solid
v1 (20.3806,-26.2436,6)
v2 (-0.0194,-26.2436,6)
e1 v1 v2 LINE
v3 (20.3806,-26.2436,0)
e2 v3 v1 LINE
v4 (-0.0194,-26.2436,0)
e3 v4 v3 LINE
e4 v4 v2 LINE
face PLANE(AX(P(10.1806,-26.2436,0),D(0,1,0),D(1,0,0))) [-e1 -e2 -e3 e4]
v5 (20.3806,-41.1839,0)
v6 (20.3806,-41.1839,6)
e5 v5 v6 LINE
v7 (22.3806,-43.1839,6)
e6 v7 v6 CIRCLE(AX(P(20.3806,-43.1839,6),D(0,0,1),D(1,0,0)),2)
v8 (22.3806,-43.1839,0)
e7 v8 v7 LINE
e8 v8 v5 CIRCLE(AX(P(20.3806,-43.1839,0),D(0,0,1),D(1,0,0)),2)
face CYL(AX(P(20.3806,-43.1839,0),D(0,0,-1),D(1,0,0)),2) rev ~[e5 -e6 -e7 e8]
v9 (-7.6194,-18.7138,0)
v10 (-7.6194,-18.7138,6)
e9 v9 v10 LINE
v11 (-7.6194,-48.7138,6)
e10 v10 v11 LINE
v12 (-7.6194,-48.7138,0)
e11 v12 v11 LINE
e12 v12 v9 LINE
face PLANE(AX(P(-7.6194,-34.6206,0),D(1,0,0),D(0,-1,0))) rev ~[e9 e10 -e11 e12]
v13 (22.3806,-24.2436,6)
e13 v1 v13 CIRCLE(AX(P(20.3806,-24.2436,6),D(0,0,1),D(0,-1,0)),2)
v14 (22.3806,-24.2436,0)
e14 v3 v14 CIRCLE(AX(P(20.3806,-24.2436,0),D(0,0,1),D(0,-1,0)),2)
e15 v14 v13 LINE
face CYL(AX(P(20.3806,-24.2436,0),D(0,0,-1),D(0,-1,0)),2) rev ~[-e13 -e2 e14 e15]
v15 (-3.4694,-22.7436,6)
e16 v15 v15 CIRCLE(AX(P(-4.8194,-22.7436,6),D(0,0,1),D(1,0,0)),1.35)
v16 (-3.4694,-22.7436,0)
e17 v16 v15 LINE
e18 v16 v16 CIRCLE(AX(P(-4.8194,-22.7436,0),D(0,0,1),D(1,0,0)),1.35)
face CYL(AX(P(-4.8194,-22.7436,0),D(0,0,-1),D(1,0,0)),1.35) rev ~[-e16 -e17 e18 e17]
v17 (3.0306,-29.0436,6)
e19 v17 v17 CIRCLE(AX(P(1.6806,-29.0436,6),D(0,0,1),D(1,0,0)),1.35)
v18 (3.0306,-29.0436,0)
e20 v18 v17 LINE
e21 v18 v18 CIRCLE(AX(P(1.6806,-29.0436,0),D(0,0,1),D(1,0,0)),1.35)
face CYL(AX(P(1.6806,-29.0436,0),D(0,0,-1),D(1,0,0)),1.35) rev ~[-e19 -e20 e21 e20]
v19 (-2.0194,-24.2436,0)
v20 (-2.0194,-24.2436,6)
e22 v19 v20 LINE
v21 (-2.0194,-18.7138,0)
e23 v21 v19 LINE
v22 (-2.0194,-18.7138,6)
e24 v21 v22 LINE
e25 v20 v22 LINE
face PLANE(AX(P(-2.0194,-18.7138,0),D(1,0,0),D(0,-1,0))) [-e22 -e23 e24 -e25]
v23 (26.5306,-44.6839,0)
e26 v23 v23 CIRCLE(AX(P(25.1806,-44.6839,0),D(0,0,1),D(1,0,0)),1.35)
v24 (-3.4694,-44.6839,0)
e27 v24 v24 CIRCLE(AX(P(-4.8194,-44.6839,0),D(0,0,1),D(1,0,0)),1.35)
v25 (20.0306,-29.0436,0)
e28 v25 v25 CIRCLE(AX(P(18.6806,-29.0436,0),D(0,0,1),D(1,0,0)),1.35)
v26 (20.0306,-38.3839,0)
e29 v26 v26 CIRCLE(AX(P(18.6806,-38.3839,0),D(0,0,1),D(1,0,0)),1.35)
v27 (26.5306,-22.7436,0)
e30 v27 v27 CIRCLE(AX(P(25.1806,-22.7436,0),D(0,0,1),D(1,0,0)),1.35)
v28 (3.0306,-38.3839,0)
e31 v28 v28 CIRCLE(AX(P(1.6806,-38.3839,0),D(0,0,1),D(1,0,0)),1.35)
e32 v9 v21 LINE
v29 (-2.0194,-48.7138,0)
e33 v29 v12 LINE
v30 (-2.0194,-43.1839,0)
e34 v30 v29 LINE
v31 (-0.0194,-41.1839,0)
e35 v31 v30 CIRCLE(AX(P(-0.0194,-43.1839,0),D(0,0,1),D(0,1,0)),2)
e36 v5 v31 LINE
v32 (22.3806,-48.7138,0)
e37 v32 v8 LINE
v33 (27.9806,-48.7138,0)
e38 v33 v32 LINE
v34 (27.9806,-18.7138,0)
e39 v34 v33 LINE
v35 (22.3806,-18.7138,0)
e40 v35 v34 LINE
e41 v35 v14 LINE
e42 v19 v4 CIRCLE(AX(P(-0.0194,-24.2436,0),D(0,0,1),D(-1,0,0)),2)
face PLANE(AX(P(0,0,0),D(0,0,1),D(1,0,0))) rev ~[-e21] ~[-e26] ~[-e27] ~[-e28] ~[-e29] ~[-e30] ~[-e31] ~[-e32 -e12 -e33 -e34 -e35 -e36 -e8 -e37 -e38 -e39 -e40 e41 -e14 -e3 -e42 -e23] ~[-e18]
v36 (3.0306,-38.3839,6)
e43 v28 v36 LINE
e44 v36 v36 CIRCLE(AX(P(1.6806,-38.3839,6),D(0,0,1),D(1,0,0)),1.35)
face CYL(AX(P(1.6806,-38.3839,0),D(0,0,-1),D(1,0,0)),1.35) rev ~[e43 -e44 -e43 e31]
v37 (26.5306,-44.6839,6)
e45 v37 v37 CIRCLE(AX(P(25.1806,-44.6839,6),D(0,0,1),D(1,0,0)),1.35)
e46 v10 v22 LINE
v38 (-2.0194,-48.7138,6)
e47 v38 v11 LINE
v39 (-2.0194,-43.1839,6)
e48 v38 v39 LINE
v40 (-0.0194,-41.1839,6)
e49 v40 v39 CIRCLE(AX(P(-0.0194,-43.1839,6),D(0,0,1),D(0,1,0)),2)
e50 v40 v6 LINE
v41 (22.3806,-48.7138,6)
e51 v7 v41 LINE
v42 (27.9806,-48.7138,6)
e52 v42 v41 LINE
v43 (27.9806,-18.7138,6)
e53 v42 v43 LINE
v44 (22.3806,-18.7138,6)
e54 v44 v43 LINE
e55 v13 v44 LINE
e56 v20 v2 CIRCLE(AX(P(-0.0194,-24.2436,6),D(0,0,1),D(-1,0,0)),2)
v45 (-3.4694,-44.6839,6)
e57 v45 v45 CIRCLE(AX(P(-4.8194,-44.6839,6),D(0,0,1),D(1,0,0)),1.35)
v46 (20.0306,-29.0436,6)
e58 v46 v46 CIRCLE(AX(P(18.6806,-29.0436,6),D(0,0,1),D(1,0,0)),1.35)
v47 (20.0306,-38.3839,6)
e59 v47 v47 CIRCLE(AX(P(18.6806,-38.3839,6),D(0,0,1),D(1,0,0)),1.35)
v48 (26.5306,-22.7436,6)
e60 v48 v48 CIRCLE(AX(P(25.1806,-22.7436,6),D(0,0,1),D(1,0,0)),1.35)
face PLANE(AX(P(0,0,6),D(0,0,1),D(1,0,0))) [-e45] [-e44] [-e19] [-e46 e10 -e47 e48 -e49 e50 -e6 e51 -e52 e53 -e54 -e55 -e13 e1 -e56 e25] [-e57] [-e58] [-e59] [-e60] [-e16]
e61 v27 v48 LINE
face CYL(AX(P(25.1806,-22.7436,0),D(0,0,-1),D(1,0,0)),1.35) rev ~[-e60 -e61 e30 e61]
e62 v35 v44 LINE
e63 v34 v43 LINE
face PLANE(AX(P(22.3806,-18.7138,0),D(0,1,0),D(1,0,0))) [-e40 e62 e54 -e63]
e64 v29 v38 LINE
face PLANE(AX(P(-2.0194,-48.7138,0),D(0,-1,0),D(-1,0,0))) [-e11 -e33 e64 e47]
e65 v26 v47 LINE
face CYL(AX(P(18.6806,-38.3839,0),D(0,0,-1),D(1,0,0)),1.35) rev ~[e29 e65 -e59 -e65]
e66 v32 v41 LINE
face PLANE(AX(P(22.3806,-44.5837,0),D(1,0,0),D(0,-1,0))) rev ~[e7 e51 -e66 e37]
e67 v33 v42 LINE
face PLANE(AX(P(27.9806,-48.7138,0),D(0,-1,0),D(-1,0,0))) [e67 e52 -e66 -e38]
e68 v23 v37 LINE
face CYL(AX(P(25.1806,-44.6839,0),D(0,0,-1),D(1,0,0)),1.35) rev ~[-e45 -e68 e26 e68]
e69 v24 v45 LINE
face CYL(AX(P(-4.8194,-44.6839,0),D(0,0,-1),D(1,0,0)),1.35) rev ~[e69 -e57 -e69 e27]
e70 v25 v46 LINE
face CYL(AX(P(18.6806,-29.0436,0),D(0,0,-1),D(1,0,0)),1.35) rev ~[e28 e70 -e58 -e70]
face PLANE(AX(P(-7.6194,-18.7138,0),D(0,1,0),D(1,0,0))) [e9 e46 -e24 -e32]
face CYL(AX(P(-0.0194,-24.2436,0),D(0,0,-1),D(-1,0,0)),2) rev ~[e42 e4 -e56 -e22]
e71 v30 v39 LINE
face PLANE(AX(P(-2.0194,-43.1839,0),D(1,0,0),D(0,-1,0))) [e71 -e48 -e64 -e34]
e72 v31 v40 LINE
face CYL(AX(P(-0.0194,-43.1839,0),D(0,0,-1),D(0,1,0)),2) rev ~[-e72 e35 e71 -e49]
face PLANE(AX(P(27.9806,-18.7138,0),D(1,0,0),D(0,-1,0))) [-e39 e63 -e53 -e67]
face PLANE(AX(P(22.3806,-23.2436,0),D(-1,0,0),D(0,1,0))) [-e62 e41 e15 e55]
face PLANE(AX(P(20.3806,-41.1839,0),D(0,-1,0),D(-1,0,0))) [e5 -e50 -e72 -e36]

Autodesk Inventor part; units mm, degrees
ref_plane "YZ Plane" through (0, 0, 0) normal (1, 0, 0) x (0, 1, 0)
ref_plane "XZ Plane" through (0, 0, 0) normal (0, 1, 0) x (-1, 0, 0)
ref_plane "XY Plane" through (0, 0, 0) normal (0, 0, 1) x (1, 0, 0)
sketch "스케치1" plane through (0, 0, 0) normal (0, 0, 1) x (1, 0, 0)
  line L0 (22.3806, -23.2436) -> (22.3806, 15.7564)
  arc A0 (20.3806, -26.2436) -> (22.3806, -24.2436) centre (20.3806, -24.2436) ccw
  line L1 (22.3806, -24.2436) -> (22.3806, -22.8439)
  line L2 (18.7808, -26.2436) -> (20.3806, -26.2436)
  line L3 (0.9806, -26.2436) -> (19.3806, -26.2436)
  arc A1 (-2.0194, -24.2436) -> (-0.0194, -26.2436) centre (-0.0194, -24.2436) ccw
  line L4 (-0.0194, -26.2436) -> (1.5803, -26.2436)
  line L5 (-2.0194, -24.2436) -> (-2.0194, -22.8439)
  line L6 (-2.0194, 15.7564) -> (-2.0194, -23.2436)
  circle A2 centre (25.1806, -22.7436) radius 1.45
  circle A3 centre (18.6806, -29.0436) radius 1.45
  circle A4 centre (1.6806, -29.0436) radius 1.45
  circle A5 centre (-4.8194, -22.7436) radius 1.45
  line L7 (-7.6194, -18.7138) -> (27.9806, -18.7138)
  line L8 (-7.6194, -18.7138) -> (27.9806, -18.7138)
  arc A6 (-0.0194, -41.1839) -> (-2.0194, -43.1839) centre (-0.0194, -43.1839) ccw
  line L9 (-2.0194, -43.1839) -> (-2.0194, -44.5837)
  line L10 (1.5803, -41.1839) -> (-0.0194, -41.1839)
  line L11 (19.3806, -41.1839) -> (0.9806, -41.1839)
  arc A7 (22.3806, -43.1839) -> (20.3806, -41.1839) centre (20.3806, -43.1839) ccw
  line L12 (20.3806, -41.1839) -> (18.7808, -41.1839)
  line L13 (22.3806, -43.1839) -> (22.3806, -44.5837)
  circle A8 centre (-4.8194, -44.6839) radius 1.45
  circle A9 centre (1.6806, -38.3839) radius 1.45
  circle A10 centre (18.6806, -38.3839) radius 1.45
  circle A11 centre (25.1806, -44.6839) radius 1.45
  line L14 (27.9806, -48.7138) -> (-7.6194, -48.7138)
  line L15 (27.9806, -48.7138) -> (-7.6194, -48.7138)
  line L16 (-2.0194, -44.5837) -> (-2.0194, -48.7138)
  line L17 (22.3806, -44.5837) -> (22.3806, -48.7138)
  line L18 (10.1806, -18.7138) -> (10.1806, -33.7138)
  line L19 (-7.6194, -48.7138) -> (27.9806, -48.7138)
  line L20 (27.9806, -48.7138) -> (27.9806, -33.7138)
  line L21 (27.9806, -33.7138) -> (-7.6194, -33.7138)
  line L22 (-7.6194, -33.7138) -> (-7.6194, -48.7138)
  circle A12 centre (10.1806, -33.7138) radius 2.4281
  line L23 (-7.6194, -18.7138) -> (-7.6194, -34.6206)
  line L24 (27.9806, -18.7138) -> (27.9806, -33.7138)
  circle A13 centre (-4.8194, -22.7436) radius 1.35
  circle A14 centre (1.6806, -29.0436) radius 1.35
  circle A15 centre (18.6806, -29.0436) radius 1.35
  circle A16 centre (25.1806, -22.7436) radius 1.35
  circle A17 centre (18.6806, -38.3839) radius 1.35
  circle A18 centre (25.1806, -44.6839) radius 1.35
  circle A19 centre (1.6806, -38.3839) radius 1.35
  circle A20 centre (-4.8194, -44.6839) radius 1.35
  point P0 (0, 0)
  point P1 (-7.1939, 58.7329)
  point P2 (22.3806, -18.7138)
  point P3 (-2.0194, -18.7138)
  point P4 (27.9806, -25.8436)
  point P5 (-7.6194, -25.8436)
  point P6 (-2.0194, -44.1839)
  point P7 (-7.6194, -41.5839)
  point P8 (22.3806, -44.1839)
  point P9 (27.9806, -41.5839)
  point P10 (-2.0194, -18.7138)
  point P11 (22.3806, -18.7138)
  point P12 (10.1806, -48.7138)
  dimension "d11" = 30
  dimension "d12" = 15
  dimension "d13" = 15
  dimension "d14" = 2.7
  dimension "d15" = 2.7
  dimension "d16" = 2.7
  dimension "d17" = 2.7
  dimension "d18" = 2.7
  dimension "d19" = 2.7
  dimension "d20" = 2.7
  dimension "d21" = 2.7
extrude "돌출1" add sketch "스케치1" along normal blind 6 contours L0 L7 L24 L21 A12 L18 L3 L2 A0 L1 | L6 L5 A1 L4 L3 L18 A12 L21 L23 L7 | L20 L14 L17 L13 A7 L12 L11 L10 A6 L9 L16 L22 L21 A12 | A12 L21 L18 | L18 L21 A12 | A12 L21 | A2 | A3 | A4 | A5 | A8 | A9 | A10 | A11
properties part number "frame_arm_to_hand1" material "PMMA 플라스틱"
